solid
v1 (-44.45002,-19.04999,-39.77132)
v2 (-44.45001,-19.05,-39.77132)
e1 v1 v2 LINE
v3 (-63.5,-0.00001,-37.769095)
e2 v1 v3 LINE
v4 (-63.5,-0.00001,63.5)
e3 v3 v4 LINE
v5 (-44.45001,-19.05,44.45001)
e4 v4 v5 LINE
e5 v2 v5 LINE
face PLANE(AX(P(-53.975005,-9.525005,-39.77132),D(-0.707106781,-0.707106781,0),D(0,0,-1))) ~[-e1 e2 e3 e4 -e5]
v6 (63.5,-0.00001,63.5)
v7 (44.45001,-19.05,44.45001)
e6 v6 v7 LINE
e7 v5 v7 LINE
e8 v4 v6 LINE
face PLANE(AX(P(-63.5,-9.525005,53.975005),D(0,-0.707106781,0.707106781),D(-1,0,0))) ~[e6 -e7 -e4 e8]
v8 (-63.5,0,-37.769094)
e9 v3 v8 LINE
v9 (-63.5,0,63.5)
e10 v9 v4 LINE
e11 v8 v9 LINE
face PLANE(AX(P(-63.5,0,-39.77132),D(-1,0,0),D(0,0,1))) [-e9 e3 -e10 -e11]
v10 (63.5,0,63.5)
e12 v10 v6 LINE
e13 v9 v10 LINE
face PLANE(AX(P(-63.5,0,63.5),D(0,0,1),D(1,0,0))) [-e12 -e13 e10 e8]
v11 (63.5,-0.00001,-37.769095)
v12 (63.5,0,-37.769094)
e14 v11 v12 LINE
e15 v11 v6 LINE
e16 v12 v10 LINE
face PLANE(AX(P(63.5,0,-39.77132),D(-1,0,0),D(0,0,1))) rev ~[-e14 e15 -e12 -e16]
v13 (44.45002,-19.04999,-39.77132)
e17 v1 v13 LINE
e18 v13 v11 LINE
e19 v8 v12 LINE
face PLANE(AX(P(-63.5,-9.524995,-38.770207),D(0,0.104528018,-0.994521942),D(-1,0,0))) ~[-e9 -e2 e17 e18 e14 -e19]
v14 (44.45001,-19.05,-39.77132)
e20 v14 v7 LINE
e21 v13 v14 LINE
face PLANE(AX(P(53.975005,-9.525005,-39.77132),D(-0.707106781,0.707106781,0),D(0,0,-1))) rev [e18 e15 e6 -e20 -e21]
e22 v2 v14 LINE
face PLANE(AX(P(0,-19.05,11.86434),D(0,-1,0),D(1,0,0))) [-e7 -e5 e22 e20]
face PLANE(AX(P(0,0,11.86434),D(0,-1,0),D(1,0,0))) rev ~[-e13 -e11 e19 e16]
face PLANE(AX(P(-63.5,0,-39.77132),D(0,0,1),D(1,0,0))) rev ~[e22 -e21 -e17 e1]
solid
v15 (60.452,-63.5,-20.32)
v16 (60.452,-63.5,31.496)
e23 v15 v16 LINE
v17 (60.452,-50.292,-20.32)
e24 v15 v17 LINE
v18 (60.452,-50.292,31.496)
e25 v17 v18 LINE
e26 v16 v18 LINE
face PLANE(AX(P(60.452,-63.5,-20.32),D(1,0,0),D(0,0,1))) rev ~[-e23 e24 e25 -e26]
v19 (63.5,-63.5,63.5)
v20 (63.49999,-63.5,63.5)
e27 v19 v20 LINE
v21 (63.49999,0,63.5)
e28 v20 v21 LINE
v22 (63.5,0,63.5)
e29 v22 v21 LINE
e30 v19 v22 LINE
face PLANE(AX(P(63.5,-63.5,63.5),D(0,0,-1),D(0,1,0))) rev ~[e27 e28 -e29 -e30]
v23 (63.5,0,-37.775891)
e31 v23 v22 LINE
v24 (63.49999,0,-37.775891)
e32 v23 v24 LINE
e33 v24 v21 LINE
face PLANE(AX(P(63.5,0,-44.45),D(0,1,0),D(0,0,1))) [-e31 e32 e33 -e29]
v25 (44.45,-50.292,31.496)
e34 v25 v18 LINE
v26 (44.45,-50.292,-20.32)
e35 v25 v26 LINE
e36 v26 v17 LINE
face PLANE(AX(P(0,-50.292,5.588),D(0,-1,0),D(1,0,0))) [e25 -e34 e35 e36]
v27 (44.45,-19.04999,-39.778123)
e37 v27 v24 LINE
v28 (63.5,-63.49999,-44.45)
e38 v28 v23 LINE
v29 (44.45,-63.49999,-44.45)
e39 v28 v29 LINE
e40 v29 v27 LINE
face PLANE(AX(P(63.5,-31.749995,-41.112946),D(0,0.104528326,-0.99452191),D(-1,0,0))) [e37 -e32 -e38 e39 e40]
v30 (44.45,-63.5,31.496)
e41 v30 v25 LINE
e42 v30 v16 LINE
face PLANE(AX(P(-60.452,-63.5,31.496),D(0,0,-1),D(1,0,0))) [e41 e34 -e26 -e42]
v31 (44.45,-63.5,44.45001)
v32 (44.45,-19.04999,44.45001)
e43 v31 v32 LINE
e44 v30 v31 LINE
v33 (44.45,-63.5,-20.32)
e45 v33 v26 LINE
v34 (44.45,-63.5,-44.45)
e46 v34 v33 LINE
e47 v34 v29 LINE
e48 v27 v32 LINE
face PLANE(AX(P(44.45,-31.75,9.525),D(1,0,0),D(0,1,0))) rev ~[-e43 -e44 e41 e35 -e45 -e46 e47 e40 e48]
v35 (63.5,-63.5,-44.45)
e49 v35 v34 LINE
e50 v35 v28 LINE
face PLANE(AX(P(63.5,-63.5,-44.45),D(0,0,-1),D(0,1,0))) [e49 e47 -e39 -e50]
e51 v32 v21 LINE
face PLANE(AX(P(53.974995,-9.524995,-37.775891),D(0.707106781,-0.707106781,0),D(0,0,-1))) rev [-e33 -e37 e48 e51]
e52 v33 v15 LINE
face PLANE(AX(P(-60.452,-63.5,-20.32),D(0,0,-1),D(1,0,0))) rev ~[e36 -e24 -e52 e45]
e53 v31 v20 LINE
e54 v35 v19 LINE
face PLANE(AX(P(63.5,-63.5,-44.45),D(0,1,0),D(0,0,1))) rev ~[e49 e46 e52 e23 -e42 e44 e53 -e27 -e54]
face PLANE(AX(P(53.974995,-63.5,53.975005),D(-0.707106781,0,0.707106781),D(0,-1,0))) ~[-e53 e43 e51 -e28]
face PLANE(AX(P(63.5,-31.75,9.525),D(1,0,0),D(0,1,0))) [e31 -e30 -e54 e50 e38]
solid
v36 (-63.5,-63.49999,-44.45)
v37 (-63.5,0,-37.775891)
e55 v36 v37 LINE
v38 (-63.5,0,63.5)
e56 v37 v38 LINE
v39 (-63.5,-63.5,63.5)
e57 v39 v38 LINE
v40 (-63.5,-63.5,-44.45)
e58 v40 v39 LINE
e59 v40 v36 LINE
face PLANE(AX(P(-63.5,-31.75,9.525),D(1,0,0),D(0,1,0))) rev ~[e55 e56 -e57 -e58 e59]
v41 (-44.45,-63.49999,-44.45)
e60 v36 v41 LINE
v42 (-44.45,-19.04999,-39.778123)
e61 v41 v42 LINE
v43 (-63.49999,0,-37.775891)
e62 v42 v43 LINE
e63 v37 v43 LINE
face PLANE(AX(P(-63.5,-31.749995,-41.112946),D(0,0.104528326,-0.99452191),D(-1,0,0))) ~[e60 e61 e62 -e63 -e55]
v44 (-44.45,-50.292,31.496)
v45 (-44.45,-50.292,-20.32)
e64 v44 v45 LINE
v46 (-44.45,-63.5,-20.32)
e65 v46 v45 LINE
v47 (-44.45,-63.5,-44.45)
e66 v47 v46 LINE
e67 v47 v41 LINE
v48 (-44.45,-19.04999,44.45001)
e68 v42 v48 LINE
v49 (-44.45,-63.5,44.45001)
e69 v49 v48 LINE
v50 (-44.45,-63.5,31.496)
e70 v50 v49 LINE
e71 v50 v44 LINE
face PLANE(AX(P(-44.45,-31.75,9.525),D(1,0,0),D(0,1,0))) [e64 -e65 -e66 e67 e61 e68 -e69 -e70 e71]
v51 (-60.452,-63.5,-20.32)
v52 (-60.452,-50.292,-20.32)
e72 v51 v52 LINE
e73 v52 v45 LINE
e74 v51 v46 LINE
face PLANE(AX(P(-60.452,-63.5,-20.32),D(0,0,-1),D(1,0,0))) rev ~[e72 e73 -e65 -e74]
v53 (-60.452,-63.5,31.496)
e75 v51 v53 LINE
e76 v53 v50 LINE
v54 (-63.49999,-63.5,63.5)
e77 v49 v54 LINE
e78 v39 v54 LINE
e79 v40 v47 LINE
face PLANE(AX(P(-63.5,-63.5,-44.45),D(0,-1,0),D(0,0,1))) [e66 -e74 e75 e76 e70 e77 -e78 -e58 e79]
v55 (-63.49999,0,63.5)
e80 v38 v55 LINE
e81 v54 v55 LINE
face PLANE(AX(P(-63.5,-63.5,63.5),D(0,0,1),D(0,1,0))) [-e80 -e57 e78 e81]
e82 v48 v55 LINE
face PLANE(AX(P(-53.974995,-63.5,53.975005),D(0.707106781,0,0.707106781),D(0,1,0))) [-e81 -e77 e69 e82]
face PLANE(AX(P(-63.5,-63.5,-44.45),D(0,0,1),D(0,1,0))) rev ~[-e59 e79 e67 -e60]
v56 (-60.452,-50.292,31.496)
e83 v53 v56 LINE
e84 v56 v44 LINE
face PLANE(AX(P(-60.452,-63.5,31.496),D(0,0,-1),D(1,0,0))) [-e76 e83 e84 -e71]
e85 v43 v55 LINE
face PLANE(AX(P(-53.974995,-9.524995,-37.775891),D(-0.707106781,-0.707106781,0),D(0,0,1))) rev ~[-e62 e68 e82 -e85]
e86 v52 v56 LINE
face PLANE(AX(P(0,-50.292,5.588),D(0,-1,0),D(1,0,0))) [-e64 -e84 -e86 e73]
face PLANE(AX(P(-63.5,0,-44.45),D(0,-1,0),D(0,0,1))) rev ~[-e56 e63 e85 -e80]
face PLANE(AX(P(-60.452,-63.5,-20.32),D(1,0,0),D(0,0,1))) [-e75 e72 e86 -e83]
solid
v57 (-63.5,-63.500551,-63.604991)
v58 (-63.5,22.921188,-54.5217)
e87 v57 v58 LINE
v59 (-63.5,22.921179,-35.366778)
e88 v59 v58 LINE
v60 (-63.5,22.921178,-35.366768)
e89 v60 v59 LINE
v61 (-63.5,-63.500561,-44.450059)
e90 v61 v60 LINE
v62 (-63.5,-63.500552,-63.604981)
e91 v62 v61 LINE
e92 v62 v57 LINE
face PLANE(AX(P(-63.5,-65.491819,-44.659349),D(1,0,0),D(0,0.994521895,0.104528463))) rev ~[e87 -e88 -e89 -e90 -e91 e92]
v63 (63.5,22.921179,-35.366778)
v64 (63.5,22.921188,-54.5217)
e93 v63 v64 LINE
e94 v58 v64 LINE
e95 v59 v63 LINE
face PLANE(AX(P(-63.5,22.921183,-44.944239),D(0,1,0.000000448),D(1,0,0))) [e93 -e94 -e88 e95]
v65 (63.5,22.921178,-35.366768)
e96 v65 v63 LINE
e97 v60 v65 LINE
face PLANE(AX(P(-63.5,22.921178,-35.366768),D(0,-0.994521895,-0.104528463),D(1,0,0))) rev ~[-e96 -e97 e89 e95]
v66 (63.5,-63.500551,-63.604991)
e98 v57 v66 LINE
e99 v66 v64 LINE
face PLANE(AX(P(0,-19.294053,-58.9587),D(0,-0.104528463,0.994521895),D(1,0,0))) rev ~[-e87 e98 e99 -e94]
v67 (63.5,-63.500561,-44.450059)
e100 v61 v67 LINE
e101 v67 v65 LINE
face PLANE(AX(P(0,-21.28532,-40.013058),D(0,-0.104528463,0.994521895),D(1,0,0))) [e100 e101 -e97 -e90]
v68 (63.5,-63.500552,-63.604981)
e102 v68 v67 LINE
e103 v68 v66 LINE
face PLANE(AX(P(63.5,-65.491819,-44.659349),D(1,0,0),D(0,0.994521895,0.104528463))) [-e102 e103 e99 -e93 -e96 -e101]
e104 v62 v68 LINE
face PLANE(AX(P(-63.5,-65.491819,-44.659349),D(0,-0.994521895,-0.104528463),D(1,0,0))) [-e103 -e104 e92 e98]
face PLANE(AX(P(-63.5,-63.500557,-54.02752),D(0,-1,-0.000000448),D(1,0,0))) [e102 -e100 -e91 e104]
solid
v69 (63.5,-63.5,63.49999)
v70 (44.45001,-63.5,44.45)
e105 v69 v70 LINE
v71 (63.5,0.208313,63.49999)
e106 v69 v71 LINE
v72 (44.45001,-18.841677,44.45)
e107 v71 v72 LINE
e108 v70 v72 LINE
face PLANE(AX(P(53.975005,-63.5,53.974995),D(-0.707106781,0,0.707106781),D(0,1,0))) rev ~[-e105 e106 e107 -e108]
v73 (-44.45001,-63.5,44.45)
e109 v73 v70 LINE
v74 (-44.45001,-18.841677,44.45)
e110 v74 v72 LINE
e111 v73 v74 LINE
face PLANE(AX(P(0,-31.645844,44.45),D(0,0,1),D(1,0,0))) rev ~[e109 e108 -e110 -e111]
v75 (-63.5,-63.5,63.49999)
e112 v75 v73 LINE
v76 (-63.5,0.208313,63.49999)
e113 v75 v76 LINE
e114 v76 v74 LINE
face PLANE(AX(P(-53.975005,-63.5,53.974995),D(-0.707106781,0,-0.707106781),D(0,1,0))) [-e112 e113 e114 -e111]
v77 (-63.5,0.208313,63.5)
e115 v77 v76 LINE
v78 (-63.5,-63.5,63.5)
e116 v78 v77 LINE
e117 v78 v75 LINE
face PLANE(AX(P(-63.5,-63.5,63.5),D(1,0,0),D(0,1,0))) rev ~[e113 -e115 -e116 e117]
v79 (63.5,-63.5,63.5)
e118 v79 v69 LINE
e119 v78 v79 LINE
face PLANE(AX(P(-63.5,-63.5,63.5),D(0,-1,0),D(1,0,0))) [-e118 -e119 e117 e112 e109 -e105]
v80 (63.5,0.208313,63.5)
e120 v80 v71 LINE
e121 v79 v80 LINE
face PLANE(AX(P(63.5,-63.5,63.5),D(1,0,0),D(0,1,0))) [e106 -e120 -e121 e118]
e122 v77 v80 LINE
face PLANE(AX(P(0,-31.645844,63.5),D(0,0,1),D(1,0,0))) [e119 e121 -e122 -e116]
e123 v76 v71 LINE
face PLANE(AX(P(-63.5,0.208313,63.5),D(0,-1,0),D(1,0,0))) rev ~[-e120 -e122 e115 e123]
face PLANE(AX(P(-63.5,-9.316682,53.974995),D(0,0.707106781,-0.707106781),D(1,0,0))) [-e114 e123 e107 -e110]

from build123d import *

# Parameters (mm, degrees)
F4_W        = 127
F4_H        = 103.27132
F5_DEPTH    = 19.05
F6_SIZE2    = 19.04999
F6_SIZE     = 19.04999
F7_SIZE2    = 2.002226
F7_SIZE     = 19.04999
F8_W        = 63.5
F8_H        = 107.95
F9_DEPTH    = 19.05
F10_SIZE2   = 6.674109
F10_SIZE    = 63.49999
F11_SIZE2   = 19.04999
F11_SIZE    = 19.04999
F12_W       = 63.5
F12_H       = 107.95
F13_DEPTH   = 19.05
F14_SIZE2   = 6.674109
F14_SIZE    = 63.49999
F15_SIZE2   = 19.04999
F15_SIZE    = 19.04999
F16_W       = 127
F16_H       = 63.7083128998
F17_DEPTH   = 19.05
F18_SIZE2   = 19.04999
F18_SIZE    = 19.04999
F20_W       = 127
F20_H       = 88.9
F21_DEPTH   = 19.05
F22_SIZE2   = 2.002226
F22_SIZE    = 19.04999
F22_2_SIZE2 = 2.002226
F22_2_SIZE  = 19.04999
F23_W       = 120.904
F23_H       = 51.816
F24_DEPTH   = 13.208


# Not quite as in the source:
# - a fillet or chamfer is up to 0.001 mm smaller than in the source, because OpenCascade refuses the exact size


with BuildPart() as f5:
    # F4 (on Front) → F5 (new body)
    with BuildSketch(Plane.XZ):
        with Locations((0, 11.86434)):
            Rectangle(F4_W, F4_H)
    extrude(amount=F5_DEPTH)

    # F6 (size 19.05 and 19.05 in the source; OpenCascade refuses exactly that, so slightly less here)
    f6_edges = [f5.edges().sort_by_distance(p)[0] for p in [
        (63.5, -19.05, 11.86434),
        (0, -19.05, 63.5),
        (-63.5, -19.05, 11.86434),
    ]]
    chamfer(f6_edges, length=F6_SIZE, length2=F6_SIZE2)

    # F7 (size 19.05 and 2.0022356818 in the source; OpenCascade refuses exactly that, so slightly less here)
    f7_edges = [f5.edges().sort_by_distance(p)[0] for p in [
        (0, 0, -39.77132),
    ]]
    f7_side = f5.faces().sort_by_distance((0, -8.964706, -39.77132))[0]
    chamfer(f7_edges, length=F7_SIZE, length2=F7_SIZE2, reference=f7_side)


with BuildPart() as f9:
    # F8 (on offset) → F9 (new body)
    with BuildSketch(Plane.YZ.offset(-63.5)):
        with Locations((-31.75, 9.525)):
            Rectangle(F8_W, F8_H)
    extrude(amount=F9_DEPTH)

    # F10 (size 63.5 and 6.6741189394 in the source; OpenCascade refuses exactly that, so slightly less here)
    f10_edges = [f9.edges().sort_by_distance(p)[0] for p in [
        (-53.975, 0, -44.45),
    ]]
    f10_side = f9.faces().sort_by_distance((-53.975, -31.75, -44.45))[0]
    chamfer(f10_edges, length=F10_SIZE, length2=F10_SIZE2, reference=f10_side)

    # F11 (size 19.05 and 19.05 in the source; OpenCascade refuses exactly that, so slightly less here)
    f11_edges = [f9.edges().sort_by_distance(p)[0] for p in [
        (-44.45, 0, 12.862054),
        (-44.45, -31.75, 63.5),
    ]]
    chamfer(f11_edges, length=F11_SIZE, length2=F11_SIZE2)


with BuildPart() as f13:
    # F12 (on offset) → F13 (new body)
    with BuildSketch(Plane.YZ.offset(63.5)):
        with Locations((-31.75, 9.525)):
            Rectangle(F12_W, F12_H)
    extrude(amount=-F13_DEPTH)

    # F14 (size 63.5 and 6.6741189394 in the source; OpenCascade refuses exactly that, so slightly less here)
    f14_edges = [f13.edges().sort_by_distance(p)[0] for p in [
        (53.975, 0, -44.45),
    ]]
    f14_side = f13.faces().sort_by_distance((53.975, -31.75, -44.45))[0]
    chamfer(f14_edges, length=F14_SIZE, length2=F14_SIZE2, reference=f14_side)

    # F15 (size 19.05 and 19.05 in the source; OpenCascade refuses exactly that, so slightly less here)
    f15_edges = [f13.edges().sort_by_distance(p)[0] for p in [
        (44.45, 0, 12.862054),
        (44.45, -31.75, 63.5),
    ]]
    chamfer(f15_edges, length=F15_SIZE, length2=F15_SIZE2)


with BuildPart() as f17:
    # F16 (on offset) → F17 (new body)
    with BuildSketch(Plane.XY.offset(63.5)):
        with Locations((0, -31.6458435501)):
            Rectangle(F16_W, F16_H)
    extrude(amount=-F17_DEPTH)

    # F18 (size 19.05 and 19.05 in the source; OpenCascade refuses exactly that, so slightly less here)
    f18_edges = [f17.edges().sort_by_distance(p)[0] for p in [
        (0, 0.208313, 44.45),
        (63.5, -31.645844, 44.45),
        (-63.5, -31.645844, 44.45),
    ]]
    chamfer(f18_edges, length=F18_SIZE, length2=F18_SIZE2)


with BuildPart() as f21:
    # F20 (on face) → F21 (new body)
    with BuildSketch(Plane(origin=(0, 3.9270236517, -37.3631342428), x_dir=(1, 0, 0), z_dir=(0, -0.1045284633, 0.9945218954))):
        with Locations((0, -25.3512205481)):
            Rectangle(F20_W, F20_H)
    extrude(amount=-F21_DEPTH)

    # F22 (size 19.05 and 2.0022356818 in the source; OpenCascade refuses exactly that, so slightly less here)
    f22_edges = [f21.edges().sort_by_distance(p)[0] for p in [
        (0, -65.491819, -44.659349),
    ]]
    f22_side = f21.faces().sort_by_distance((0, -64.496185, -54.13217))[0]
    chamfer(f22_edges, length=F22_SIZE, length2=F22_SIZE2, reference=f22_side)

    # F22#2 (size 19.05 and 2.0022356818 in the source; OpenCascade refuses exactly that, so slightly less here)
    f22_2_edges = [f21.edges().sort_by_distance(p)[0] for p in [
        (0, 24.912445, -54.31241),
    ]]
    f22_2_side = f21.faces().sort_by_distance((0, 23.916812, -44.839589))[0]
    chamfer(f22_2_edges, length=F22_2_SIZE, length2=F22_2_SIZE2, reference=f22_2_side)


with BuildPart() as f24:
    # F23 (on offset) → F24 (new body)
    with BuildSketch(Plane.XZ.offset(63.5)):
        with Locations((0, 5.588)):
            Rectangle(F23_W, F23_H)
    extrude(amount=-F24_DEPTH)


with BuildPart() as f13_1:
    add(f13.part)

    # F25: cut F24
    add(f24.part, mode=Mode.SUBTRACT)


with BuildPart() as f9_1:
    add(f9.part)

    # F25: cut F24
    add(f24.part, mode=Mode.SUBTRACT)


solid = Compound([f5.part, f17.part, f21.part, f13_1.part, f9_1.part])
